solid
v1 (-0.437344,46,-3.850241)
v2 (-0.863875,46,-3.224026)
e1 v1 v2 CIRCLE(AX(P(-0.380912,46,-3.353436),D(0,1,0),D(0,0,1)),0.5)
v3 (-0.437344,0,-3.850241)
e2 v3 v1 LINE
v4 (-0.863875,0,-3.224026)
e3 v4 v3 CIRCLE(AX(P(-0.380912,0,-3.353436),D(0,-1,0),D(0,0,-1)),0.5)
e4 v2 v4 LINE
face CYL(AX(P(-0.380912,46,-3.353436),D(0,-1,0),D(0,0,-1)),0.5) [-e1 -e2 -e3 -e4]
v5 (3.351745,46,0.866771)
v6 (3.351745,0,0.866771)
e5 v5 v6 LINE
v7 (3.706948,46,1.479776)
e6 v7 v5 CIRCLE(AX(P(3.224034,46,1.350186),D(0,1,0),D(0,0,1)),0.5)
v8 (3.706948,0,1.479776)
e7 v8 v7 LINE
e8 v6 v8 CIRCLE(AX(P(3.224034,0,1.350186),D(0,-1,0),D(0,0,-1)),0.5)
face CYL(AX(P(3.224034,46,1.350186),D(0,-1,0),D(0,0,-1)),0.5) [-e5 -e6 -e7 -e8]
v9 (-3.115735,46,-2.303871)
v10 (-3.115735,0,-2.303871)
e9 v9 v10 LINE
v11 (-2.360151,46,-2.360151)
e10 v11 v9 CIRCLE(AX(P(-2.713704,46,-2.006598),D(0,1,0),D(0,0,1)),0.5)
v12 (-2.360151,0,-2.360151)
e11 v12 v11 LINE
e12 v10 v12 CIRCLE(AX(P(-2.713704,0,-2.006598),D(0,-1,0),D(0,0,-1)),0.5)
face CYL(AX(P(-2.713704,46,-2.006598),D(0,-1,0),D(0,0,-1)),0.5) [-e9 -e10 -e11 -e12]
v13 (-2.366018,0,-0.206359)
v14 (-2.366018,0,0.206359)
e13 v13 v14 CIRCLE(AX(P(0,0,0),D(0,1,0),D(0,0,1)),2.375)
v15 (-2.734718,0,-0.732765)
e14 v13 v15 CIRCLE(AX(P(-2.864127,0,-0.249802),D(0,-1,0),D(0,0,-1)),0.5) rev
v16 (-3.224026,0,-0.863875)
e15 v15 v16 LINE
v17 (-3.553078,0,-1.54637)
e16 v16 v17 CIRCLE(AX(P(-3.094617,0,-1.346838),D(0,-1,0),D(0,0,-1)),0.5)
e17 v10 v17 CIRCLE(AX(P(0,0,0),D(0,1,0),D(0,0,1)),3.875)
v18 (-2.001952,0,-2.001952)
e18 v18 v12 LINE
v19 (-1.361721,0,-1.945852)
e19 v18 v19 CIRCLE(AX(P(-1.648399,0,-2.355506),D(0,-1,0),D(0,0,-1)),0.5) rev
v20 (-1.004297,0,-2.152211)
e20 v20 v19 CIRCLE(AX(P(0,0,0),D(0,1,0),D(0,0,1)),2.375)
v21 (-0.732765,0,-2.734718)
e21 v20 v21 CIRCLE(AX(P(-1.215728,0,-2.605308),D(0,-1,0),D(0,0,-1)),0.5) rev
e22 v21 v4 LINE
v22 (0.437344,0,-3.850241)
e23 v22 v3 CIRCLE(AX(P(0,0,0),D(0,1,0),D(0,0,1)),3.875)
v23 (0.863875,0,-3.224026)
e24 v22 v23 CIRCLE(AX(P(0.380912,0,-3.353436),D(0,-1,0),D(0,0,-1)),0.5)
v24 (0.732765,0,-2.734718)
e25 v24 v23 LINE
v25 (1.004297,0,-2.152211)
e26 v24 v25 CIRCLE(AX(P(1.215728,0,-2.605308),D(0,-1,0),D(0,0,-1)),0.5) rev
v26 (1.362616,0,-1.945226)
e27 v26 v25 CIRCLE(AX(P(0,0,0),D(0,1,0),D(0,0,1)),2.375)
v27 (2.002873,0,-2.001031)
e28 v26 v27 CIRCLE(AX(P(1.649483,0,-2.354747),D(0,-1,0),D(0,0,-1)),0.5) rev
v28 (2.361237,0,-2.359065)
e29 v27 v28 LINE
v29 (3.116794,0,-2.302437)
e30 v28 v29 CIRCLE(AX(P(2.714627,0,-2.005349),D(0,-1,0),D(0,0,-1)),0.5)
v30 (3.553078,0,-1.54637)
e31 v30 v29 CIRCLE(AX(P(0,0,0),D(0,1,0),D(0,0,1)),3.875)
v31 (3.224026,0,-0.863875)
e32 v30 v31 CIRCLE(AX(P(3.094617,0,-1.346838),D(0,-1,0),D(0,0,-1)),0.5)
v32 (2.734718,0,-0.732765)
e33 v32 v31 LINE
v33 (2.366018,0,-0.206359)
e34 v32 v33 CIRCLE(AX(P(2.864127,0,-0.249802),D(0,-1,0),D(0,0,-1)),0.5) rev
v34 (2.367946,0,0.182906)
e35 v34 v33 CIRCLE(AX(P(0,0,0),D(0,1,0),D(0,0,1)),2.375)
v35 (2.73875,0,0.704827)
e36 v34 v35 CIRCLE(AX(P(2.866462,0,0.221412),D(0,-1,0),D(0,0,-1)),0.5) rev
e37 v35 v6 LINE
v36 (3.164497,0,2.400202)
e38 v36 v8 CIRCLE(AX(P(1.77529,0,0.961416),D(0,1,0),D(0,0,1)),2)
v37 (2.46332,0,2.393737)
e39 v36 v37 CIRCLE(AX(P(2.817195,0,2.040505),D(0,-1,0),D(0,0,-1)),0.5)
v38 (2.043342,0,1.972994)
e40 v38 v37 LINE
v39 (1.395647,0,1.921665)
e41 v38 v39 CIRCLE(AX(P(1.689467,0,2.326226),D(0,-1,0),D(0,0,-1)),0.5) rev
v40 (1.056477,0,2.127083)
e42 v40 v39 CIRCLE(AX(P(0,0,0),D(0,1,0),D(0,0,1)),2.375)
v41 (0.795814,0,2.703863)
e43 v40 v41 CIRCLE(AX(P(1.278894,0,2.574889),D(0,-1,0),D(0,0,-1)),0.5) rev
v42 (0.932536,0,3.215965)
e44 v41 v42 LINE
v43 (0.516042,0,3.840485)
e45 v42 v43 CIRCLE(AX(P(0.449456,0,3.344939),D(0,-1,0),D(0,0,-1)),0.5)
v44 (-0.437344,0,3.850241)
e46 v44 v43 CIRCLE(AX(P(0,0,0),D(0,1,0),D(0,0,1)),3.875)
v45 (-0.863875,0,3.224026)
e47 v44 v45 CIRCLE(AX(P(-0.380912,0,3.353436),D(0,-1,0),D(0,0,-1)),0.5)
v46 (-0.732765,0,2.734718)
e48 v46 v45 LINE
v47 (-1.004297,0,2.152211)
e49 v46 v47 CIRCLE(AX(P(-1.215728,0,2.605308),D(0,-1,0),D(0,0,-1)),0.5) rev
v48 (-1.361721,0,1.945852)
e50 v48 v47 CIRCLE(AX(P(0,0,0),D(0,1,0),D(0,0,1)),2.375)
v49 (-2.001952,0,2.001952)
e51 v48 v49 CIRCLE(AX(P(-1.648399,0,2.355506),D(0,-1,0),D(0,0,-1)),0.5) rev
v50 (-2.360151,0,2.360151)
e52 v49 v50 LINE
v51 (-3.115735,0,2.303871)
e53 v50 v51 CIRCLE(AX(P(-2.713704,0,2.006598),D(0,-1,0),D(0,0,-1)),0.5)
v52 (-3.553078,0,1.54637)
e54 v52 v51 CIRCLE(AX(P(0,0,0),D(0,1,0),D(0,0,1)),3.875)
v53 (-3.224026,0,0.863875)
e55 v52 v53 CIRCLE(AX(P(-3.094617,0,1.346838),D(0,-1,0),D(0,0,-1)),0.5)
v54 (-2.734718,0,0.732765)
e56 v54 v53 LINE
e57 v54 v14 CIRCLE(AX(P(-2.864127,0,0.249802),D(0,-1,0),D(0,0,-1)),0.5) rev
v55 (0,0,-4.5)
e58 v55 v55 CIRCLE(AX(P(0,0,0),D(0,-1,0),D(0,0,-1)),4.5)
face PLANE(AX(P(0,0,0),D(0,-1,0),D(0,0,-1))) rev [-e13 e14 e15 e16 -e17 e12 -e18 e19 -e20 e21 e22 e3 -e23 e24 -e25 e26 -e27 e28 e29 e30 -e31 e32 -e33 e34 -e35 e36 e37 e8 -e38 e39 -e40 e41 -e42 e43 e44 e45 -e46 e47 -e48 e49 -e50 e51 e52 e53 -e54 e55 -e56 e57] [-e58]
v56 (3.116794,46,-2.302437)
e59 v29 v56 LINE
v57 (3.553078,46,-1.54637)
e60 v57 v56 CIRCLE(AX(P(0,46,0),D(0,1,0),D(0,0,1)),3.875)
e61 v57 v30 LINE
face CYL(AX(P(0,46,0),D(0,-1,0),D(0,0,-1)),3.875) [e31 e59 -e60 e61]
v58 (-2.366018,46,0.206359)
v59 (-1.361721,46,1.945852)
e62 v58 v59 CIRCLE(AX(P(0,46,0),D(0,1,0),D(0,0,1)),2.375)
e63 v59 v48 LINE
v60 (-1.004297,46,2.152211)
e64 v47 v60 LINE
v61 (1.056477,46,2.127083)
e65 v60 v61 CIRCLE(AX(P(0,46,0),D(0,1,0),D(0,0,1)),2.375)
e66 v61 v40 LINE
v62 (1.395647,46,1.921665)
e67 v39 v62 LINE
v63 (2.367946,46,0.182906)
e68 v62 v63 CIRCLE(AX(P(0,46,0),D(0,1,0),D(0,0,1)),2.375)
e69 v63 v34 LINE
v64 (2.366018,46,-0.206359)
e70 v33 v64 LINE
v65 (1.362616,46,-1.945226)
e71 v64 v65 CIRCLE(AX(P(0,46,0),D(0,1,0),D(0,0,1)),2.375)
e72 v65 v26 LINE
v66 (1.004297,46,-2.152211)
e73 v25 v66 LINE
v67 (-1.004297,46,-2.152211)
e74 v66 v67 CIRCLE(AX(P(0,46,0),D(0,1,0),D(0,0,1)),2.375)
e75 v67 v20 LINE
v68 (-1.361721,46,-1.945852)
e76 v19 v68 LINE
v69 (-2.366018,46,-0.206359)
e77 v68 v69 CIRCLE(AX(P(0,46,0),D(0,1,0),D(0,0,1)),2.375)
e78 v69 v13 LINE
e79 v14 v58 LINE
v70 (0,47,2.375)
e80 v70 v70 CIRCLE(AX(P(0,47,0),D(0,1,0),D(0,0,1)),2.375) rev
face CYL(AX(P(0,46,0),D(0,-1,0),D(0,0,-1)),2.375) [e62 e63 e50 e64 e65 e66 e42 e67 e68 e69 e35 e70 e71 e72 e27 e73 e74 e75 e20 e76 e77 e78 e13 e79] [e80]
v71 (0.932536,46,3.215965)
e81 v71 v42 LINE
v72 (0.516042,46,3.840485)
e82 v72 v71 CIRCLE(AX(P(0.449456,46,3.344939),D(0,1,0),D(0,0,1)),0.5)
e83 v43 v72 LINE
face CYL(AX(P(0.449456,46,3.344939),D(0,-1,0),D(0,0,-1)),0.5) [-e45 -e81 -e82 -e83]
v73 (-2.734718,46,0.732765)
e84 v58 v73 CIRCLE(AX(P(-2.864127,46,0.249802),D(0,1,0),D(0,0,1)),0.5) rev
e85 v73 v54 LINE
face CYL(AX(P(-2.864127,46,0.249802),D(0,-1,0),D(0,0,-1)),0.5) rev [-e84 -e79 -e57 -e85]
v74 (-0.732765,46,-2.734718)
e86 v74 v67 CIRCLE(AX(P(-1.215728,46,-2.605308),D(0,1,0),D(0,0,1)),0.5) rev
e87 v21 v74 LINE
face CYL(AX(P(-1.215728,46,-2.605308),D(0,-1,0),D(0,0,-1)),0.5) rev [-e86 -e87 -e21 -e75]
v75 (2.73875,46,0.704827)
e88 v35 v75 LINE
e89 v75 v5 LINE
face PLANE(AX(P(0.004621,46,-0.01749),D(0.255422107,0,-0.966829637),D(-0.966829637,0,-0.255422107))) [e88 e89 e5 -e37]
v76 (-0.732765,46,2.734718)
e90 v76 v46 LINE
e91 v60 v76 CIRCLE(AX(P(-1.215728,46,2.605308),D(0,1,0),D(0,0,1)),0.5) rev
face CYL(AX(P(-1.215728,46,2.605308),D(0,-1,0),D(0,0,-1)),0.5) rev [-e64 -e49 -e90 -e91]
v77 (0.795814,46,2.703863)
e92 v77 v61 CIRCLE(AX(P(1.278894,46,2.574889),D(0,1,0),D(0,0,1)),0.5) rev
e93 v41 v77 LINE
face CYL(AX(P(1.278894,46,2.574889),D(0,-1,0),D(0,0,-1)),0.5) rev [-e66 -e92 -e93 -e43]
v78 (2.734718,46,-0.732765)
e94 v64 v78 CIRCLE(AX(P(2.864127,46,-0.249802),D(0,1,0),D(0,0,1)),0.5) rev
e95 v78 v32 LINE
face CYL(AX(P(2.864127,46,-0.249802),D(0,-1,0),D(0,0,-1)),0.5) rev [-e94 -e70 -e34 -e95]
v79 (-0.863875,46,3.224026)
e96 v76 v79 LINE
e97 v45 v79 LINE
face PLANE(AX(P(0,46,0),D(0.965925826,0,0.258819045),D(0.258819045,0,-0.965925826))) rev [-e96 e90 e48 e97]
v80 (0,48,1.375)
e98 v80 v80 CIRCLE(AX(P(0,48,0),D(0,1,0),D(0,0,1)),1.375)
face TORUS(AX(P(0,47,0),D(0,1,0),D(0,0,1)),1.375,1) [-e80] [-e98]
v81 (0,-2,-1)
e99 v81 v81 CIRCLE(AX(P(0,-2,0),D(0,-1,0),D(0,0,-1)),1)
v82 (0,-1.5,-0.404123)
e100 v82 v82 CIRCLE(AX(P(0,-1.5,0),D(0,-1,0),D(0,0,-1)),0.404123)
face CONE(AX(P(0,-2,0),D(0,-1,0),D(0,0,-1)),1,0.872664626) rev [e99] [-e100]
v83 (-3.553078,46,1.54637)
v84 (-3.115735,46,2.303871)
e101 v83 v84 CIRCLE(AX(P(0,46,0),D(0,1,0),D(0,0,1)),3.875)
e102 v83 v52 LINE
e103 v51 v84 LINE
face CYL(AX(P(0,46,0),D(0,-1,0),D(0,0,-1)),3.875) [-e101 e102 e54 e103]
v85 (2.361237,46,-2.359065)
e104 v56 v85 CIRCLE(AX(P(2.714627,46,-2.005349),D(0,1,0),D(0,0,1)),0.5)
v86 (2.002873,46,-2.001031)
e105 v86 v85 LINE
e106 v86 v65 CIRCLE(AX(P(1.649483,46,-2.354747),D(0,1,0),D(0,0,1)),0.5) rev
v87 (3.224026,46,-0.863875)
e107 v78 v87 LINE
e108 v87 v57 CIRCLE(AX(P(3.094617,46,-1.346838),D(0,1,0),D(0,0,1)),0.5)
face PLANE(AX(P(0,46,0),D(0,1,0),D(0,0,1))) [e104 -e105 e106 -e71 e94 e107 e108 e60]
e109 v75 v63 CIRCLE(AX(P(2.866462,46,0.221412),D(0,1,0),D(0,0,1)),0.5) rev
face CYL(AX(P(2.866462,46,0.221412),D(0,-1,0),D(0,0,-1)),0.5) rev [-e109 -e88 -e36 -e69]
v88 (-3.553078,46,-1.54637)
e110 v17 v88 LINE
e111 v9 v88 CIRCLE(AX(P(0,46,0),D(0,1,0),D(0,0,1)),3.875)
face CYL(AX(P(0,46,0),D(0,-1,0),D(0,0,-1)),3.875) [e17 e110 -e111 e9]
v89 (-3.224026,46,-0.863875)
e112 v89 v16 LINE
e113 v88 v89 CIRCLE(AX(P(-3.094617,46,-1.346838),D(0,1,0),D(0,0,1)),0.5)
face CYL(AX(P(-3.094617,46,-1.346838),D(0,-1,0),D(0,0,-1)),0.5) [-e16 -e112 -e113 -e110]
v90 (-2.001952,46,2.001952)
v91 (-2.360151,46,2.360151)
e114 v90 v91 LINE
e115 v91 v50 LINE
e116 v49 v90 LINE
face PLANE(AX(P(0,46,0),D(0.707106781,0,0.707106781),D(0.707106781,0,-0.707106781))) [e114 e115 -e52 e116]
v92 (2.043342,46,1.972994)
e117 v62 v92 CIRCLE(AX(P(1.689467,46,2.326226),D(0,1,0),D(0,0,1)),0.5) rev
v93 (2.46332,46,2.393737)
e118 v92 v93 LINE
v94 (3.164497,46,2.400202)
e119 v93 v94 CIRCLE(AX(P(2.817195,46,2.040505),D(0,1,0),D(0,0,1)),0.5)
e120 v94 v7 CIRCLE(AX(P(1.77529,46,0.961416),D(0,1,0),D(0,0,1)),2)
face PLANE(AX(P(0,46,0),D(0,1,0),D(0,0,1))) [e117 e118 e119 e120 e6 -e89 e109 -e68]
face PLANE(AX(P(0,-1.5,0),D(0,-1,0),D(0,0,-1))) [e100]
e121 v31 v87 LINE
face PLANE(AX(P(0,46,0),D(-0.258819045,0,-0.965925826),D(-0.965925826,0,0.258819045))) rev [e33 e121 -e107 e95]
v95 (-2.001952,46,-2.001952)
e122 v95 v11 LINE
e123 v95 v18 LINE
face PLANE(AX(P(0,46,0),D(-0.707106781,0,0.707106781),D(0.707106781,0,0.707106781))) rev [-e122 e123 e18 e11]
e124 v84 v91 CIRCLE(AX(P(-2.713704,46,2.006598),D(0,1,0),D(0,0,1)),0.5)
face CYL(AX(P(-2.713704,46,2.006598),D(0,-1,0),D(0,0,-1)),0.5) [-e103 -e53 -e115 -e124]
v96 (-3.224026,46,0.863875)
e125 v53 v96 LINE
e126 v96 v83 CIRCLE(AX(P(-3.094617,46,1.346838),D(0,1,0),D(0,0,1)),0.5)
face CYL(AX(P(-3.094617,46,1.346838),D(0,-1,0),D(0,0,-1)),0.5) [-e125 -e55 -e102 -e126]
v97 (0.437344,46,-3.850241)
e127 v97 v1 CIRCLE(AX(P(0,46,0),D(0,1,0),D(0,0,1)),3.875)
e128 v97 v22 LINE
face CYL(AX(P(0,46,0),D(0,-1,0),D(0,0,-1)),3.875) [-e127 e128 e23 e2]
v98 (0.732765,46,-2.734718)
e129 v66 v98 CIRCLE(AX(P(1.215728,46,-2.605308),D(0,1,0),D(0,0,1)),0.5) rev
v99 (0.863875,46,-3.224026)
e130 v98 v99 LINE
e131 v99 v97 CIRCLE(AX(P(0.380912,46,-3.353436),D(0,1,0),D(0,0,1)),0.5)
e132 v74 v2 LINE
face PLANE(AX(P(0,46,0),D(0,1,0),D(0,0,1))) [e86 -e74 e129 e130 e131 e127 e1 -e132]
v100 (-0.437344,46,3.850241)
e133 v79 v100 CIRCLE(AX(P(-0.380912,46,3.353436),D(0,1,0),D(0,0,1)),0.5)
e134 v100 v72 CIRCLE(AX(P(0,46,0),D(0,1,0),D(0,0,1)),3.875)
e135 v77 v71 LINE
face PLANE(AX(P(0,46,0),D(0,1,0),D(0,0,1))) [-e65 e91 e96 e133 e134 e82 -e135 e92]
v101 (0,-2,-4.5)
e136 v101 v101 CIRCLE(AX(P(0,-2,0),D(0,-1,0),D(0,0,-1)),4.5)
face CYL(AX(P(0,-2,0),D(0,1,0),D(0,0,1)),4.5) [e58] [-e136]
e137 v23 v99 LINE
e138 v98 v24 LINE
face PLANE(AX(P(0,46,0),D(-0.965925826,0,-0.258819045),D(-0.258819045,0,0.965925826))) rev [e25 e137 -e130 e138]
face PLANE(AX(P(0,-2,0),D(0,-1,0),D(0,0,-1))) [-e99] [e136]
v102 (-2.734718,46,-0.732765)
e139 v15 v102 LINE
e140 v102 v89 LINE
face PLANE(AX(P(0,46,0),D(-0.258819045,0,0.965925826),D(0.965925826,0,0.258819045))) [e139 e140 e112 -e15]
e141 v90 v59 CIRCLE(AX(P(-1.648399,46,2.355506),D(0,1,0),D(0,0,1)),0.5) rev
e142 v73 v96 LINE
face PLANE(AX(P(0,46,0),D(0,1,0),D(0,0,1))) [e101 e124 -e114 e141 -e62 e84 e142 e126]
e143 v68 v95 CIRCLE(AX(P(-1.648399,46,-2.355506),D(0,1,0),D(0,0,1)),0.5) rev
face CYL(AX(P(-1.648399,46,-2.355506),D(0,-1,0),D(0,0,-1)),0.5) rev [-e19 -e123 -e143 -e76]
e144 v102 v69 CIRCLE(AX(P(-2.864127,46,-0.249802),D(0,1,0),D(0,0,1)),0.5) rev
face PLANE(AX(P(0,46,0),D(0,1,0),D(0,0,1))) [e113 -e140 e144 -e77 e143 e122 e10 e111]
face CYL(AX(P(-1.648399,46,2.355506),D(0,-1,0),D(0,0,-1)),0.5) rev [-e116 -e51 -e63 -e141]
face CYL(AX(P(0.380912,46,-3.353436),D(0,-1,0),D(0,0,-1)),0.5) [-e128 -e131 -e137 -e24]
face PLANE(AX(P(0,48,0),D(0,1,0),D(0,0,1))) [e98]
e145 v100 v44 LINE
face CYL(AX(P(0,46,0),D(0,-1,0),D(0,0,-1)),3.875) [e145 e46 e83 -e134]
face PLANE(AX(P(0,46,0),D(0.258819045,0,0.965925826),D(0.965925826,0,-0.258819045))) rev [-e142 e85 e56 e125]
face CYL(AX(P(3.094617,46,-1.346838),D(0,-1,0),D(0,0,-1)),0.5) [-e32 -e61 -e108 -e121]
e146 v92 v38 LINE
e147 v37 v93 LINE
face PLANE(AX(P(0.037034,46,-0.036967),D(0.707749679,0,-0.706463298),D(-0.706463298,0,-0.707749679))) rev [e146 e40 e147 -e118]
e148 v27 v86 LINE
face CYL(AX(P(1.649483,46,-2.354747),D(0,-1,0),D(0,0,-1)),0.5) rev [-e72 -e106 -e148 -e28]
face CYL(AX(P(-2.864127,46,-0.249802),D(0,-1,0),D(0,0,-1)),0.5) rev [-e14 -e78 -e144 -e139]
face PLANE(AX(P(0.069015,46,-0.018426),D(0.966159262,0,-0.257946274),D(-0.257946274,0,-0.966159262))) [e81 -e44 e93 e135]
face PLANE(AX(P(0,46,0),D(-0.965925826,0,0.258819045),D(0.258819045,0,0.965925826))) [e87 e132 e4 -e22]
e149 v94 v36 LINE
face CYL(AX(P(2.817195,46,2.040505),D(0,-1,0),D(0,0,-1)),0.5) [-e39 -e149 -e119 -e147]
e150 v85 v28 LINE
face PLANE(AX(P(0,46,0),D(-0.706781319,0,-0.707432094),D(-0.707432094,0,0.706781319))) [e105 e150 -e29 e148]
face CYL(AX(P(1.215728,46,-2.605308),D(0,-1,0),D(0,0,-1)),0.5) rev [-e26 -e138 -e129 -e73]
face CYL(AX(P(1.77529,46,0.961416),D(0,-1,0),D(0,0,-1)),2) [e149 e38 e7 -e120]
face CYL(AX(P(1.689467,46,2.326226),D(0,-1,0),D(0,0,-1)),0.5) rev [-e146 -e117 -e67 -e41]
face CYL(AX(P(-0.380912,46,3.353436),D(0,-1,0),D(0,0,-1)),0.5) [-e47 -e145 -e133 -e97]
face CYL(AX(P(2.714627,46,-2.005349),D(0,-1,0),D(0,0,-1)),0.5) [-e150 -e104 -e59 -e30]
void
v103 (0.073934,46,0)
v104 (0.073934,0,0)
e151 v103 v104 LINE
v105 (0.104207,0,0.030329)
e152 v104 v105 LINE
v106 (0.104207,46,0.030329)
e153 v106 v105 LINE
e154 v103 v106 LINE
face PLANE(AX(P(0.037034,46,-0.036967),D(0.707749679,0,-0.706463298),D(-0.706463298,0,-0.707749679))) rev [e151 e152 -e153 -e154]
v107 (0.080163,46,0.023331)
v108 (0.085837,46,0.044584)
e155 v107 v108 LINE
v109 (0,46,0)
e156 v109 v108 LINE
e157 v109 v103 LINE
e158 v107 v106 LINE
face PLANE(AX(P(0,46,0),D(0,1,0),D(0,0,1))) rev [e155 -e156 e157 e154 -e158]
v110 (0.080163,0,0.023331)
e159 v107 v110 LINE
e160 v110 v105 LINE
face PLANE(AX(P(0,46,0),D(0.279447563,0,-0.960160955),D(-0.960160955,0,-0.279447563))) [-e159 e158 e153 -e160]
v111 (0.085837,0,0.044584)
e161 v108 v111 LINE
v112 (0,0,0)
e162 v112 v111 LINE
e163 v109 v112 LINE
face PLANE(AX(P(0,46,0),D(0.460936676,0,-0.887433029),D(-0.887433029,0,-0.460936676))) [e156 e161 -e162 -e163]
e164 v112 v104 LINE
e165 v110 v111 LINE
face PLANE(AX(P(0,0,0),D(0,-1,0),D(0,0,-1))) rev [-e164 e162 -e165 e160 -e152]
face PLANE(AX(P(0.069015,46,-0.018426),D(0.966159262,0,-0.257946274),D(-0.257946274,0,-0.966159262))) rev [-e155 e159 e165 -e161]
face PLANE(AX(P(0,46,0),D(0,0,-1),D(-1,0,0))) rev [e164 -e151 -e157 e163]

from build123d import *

# Parameters (mm, degrees)
BOSS_EXTRUDE1_DEPTH = 46
SKETCH3_R           = 4.5
BOSS_EXTRUDE2_DEPTH = 2
SKETCH4_R           = 2.375
BOSS_EXTRUDE3_DEPTH = 2
FILLET1_R           = 0.5
SKETCH6_R           = 1
CUT_EXTRUDE4_DEPTH  = 0.5
CUT_EXTRUDE4_DRAFT  = -50
FILLET2_R           = 1


with BuildPart() as part:
    # Sketch2 → Boss-Extrude1 (new body)
    with BuildSketch(Plane(origin=(0, 0, 0), x_dir=(1, 0, 0), z_dir=(0, 1, 0))):
        with BuildLine():
            Line((3.775215965, -0.978645895), (2.300774305, -0.58912019))
            ThreePointArc((2.300774305, -0.58912019), (2.374963211, 0.013219106), (2.294073837, 0.614695232))
            Line((2.294073837, 0.614695232), (3.742962577, 1.0029238))
            ThreePointArc((3.742962577, 1.0029238), (3.356294138, 1.936727823), (2.741299364, 2.73877761))
            Line((2.741299364, 2.73877761), (1.680151223, 1.678605632))
            ThreePointArc((1.680151223, 1.678605632), (1.187973207, 2.056537055), (0.614695232, 2.294073837))
            Line((0.614695232, 2.294073837), (1.0029238, 3.742962577))
            ThreePointArc((1.0029238, 3.742962577), (0, 3.875), (-1.0029238, 3.742962577))
            Line((-1.0029238, 3.742962577), (-0.614695232, 2.294073837))
            ThreePointArc((-0.614695232, 2.294073837), (-1.1875, 2.056810334), (-1.679378605, 1.679378605))
            Line((-1.679378605, 1.679378605), (-2.740038777, 2.740038777))
            ThreePointArc((-2.740038777, 2.740038777), (-3.35584844, 1.9375), (-3.742962577, 1.0029238))
            Line((-3.742962577, 1.0029238), (-2.294073837, 0.614695232))
            ThreePointArc((-2.294073837, 0.614695232), (-2.375, 0), (-2.294073837, -0.614695232))
            Line((-2.294073837, -0.614695232), (-3.742962577, -1.0029238))
            ThreePointArc((-3.742962577, -1.0029238), (-3.35584844, -1.9375), (-2.740038777, -2.740038777))
            Line((-2.740038777, -2.740038777), (-1.679378605, -1.679378605))
            ThreePointArc((-1.679378605, -1.679378605), (-1.1875, -2.056810334), (-0.614695232, -2.294073837))
            Line((-0.614695232, -2.294073837), (-1.0029238, -3.742962577))
            ThreePointArc((-1.0029238, -3.742962577), (0.033967076, -3.874851125), (1.068386506, -3.724805401))
            Line((1.068386506, -3.724805401), (0.681359786, -2.275164575))
            ThreePointArc((0.681359786, -2.275164575), (1.238849907, -2.026296106), (1.714477211, -1.643530618))
            Line((1.714477211, -1.643530618), (2.767163136, -2.698133353))
            ThreePointArc((2.767163136, -2.698133353), (3.500652231, -1.972912562), (3.775215965, -0.978645895))
        make_face()
        Polygon((0.085836926, -0.044584082), (0, 0), (0.073933818, 0), (0.104207494, -0.030328801), (0.080162685, -0.023330742), align=None, mode=Mode.SUBTRACT)
    extrude(amount=BOSS_EXTRUDE1_DEPTH)

    # Sketch3 → Boss-Extrude2 (add)
    with BuildSketch(Plane.XZ):
        with Locations(Location((0, 0, 0), (0, 0, 270))):
            Circle(SKETCH3_R)
    extrude(amount=BOSS_EXTRUDE2_DEPTH)

    # Sketch4 → Boss-Extrude3 (add)
    with BuildSketch(Plane(origin=(0, 46, 0), x_dir=(1, 0, 0), z_dir=(0, 1, 0))):
        with Locations(Location((0, 0, 0), (0, 0, 75))):
            Circle(SKETCH4_R)
    extrude(amount=BOSS_EXTRUDE3_DEPTH)

    # Fillet1
    # the kernel refuses this fillet: 0.5 mm, written as the material it adds along each edge
    with BuildSketch(Plane(origin=(-2.294073837, -1.140469783, 0.614695232), x_dir=(-0.965925826289068, 0, 0.2588190451025218), z_dir=(0, 1, 0)), Plane(origin=(-1.679378605, -1.140469783, -1.679378605), x_dir=(-0.7071067811865478, 0, -0.7071067811865474), z_dir=(0, 1, 0)), Plane(origin=(0.614695232, -1.140469783, -2.294073837), x_dir=(0.2588190451025215, 0, -0.9659258262890681), z_dir=(0, 1, 0)), Plane(origin=(2.294073837, -1.140469783, -0.614695232), x_dir=(0.9659258262890681, 0, -0.2588190451025215), z_dir=(0, 1, 0)), Plane(origin=(-0.614695232, -1.140469783, 2.294073837), x_dir=(-0.2588190451025215, 0, 0.9659258262890681), z_dir=(0, 1, 0))) as fillet1_piece_1:
        with BuildLine():
            CenterArc((0.456187913, -0.5), FILLET1_R, 90, 79.984589832)
            ThreePointArc((-0.036192593, -0.413043478), (-0.00906545, -0.20731306), (0, 0))
            Line((0, 0), (0.456187913, 0))
        make_face()
    extrude(amount=47.140469783)
    with BuildSketch(Plane(origin=(-2.294073837, -1.140469783, -0.614695232), x_dir=(-0.17351574004952178, 0, 0.9848310961556133), z_dir=(0, 1, 0)), Plane(origin=(-1.679378605, -1.140469783, 1.679378605), x_dir=(0.7661308776828862, 0, 0.6426845869171364), z_dir=(0, 1, 0))) as fillet1_piece_2:
        with BuildLine():
            CenterArc((0.458270974, -0.498091484), FILLET1_R, 95.007705084, 79.984589832)
            Line((-0.03982051, -0.45444663), (0, 0))
            ThreePointArc((0, 0), (0.20731306, -0.00906545), (0.414626119, 0))
        make_face()
    extrude(amount=47.140469783)
    with BuildSketch(Plane(origin=(-0.614695232, -1.140469783, -2.294073837), x_dir=(-0.258819045102522, 0, -0.965925826289068), z_dir=(0, 1, 0)), Plane(origin=(1.680151223, -1.140469783, -1.678605632), x_dir=(0.707432093873984, 0, -0.7067813187663288), z_dir=(0, 1, 0))) as fillet1_piece_3:
        with BuildLine():
            CenterArc((0.456187913, 0.5), FILLET1_R, 190.015410168, 79.984589832)
            ThreePointArc((-0.036192593, 0.413043478), (-0.00906545, 0.20731306), (0, 0))
            Line((0, 0), (0.456187913, 0))
        make_face()
    extrude(amount=47.140469783)
    with BuildSketch(Plane(origin=(2.300774305, -1.132506036, 0.58912019), x_dir=(0.16314582309469597, 0, -0.9866019665532569), z_dir=(0, 1, 0))) as fillet1_piece_4:
        with BuildLine():
            CenterArc((0.455070929, -0.498118095), FILLET1_R, 94.972648578, 79.61829146)
            Line((-0.042702606, -0.450985227), (0, 0))
            ThreePointArc((0, 0), (0.20586542, -0.008939048), (0.411730841, 0))
        make_face()
    extrude(amount=47.132506036)
    with BuildSketch(Plane(origin=(1.714477211, -1.163771178, 1.643530618), x_dir=(0.7064632978713467, 0, 0.7077496794494088), z_dir=(0, 1, 0))) as fillet1_piece_5:
        with BuildLine():
            CenterArc((0.465508471, -0.5), FILLET1_R, 90, 81.041880237)
            ThreePointArc((-0.02839274, -0.422143763), (-0.00477723, -0.211705398), (0, 0))
            Line((0, 0), (0.465508471, 0))
        make_face()
    extrude(amount=47.163771178)
    with BuildSketch(Plane(origin=(0.681359786, -1.109284133, 2.275164575), x_dir=(0.9301474254657973, 0, -0.3671862836481626), z_dir=(0, 1, 0))) as fillet1_piece_6:
        with BuildLine():
            CenterArc((0.445739753, -0.498194619), FILLET1_R, 94.870436099, 78.535607624)
            Line((-0.050952689, -0.440778436), (0, 0))
            ThreePointArc((0, 0), (0.201644174, -0.008575561), (0.403288348, 0))
        make_face()
    extrude(amount=47.109284133)
    # the kernel refuses this fillet: 0.5 mm, written as the material it takes off along each edge
    with BuildSketch(Plane(origin=(-2.740038777, 0, 2.740038777), x_dir=(-0.6526300069150477, 0, -0.7576767609436524), z_dir=(0, 1, 0)), Plane(origin=(-3.742962577, 0, -1.0029238), x_dir=(0.32985231937679765, 0, -0.9440325457322681), z_dir=(0, 1, 0)), Plane(origin=(-1.0029238, 0, -3.742962577), x_dir=(0.982482326291838, 0, -0.18635578478860887), z_dir=(0, 1, 0)), Plane(origin=(2.741299364, 0, -2.73877761), x_dir=(0.6522812796019254, 0, 0.7579769998363239), z_dir=(0, 1, 0))) as fillet1_2_piece_1:
        with BuildLine():
            CenterArc((0.538524723, -0.49861874), FILLET1_R, 85.740187873, 98.519624254)
            Line((0.039905983, -0.535758376), (0, 0))
            ThreePointArc((0, 0), (0.287832179, 0.010704768), (0.575664359, 0))
        make_face()
    extrude(amount=47.439160897, mode=Mode.SUBTRACT)
    with BuildSketch(Plane(origin=(-3.742962577, 0, 1.0029238), x_dir=(0.9659258262890679, 0, -0.2588190451025218), z_dir=(0, 1, 0)), Plane(origin=(-2.740038777, 0, -2.740038777), x_dir=(0.7071067811865476, 0, 0.7071067811865476), z_dir=(0, 1, 0)), Plane(origin=(1.0029238, 0, -3.742962577), x_dir=(-0.25881904510252196, 0, 0.965925826289068), z_dir=(0, 1, 0)), Plane(origin=(3.742962577, 0, -1.0029238), x_dir=(-0.9659258262890681, 0, 0.25881904510252185), z_dir=(0, 1, 0)), Plane(origin=(-1.0029238, 0, 3.742962577), x_dir=(0.2588190451025216, 0, -0.9659258262890681), z_dir=(0, 1, 0))) as fillet1_2_piece_2:
        with BuildLine():
            CenterArc((0.537242519, -0.5), FILLET1_R, 90, 98.519624254)
            ThreePointArc((0.04275993, -0.574074074), (0.010704768, -0.287832179), (0, 0))
            Line((0, 0), (0.537242519, 0))
        make_face()
    extrude(amount=47.439160897, mode=Mode.SUBTRACT)
    with BuildSketch(Plane(origin=(3.775215965, 0, 0.978645895), x_dir=(-0.13498089829276533, 0, 0.9908482008340522), z_dir=(0, 1, 0))) as fillet1_2_piece_3:
        with BuildLine():
            CenterArc((0.442538799, -0.49598715), FILLET1_R, 82.736098253, 90.22281865)
            Line((-0.053690457, -0.434696649), (0, 0))
            ThreePointArc((0, 0), (0.252879314, 0.016051399), (0.505758627, 0))
        make_face()
    extrude(amount=47.264396568, mode=Mode.SUBTRACT)
    with BuildSketch(Plane(origin=(2.767163136, 0, 2.698133353), x_dir=(0.8000663385432955, 0, -0.5999115384203949), z_dir=(0, 1, 0))) as fillet1_2_piece_4:
        with BuildLine():
            CenterArc((0.434547354, 0.496131331), FILLET1_R, 188.084320914, 89.047719887)
            Line((-0.060483736, 0.425816179), (0, 0))
            ThreePointArc((0, 0), (0.248312773, -0.015474675), (0.496625547, 0))
        make_face()
    extrude(amount=47.241563867, mode=Mode.SUBTRACT)
    with BuildSketch(Plane(origin=(1.068386506, 0, 3.724805401), x_dir=(-0.9787647804449897, 0, 0.20498659605074468), z_dir=(0, 1, 0))) as fillet1_2_piece_5:
        with BuildLine():
            CenterArc((0.527919562, -0.498672678), FILLET1_R, 85.824226653, 97.295295094)
            Line((0.028660468, -0.525882193), (0, 0))
            ThreePointArc((0, 0), (0.282163904, 0.010286747), (0.564327807, 0))
        make_face()
    extrude(amount=47.410819518, mode=Mode.SUBTRACT)


with BuildPart() as cut_extrude4_tool:
    # Sketch6 → Cut-Extrude4 (with draft: the straight prism first)
    with BuildSketch(Plane.XZ.offset(2)):
        Circle(SKETCH6_R)
    extrude(amount=-CUT_EXTRUDE4_DEPTH)
    # Cut-Extrude4: the draft: its side faces are tilted about the plane it starts from
    cut_extrude4_sides = [cut_extrude4_tool.faces().sort_by_distance(p)[0] for p in [
        (-1, -1.75, 0),
    ]]
    draft(cut_extrude4_sides, Plane.XZ.offset(2), CUT_EXTRUDE4_DRAFT)


with BuildPart() as part_1:
    add(part.part)

    # Cut-Extrude4: cut by cut_extrude4_tool
    add(cut_extrude4_tool.part, mode=Mode.SUBTRACT)

    # Fillet2
    fillet2_edges = [part_1.edges().sort_by_distance(p)[0] for p in [
        (-0.614695232, 48, 2.294073837),
    ]]
    fillet(fillet2_edges, radius=FILLET2_R)


solid = part_1.part
